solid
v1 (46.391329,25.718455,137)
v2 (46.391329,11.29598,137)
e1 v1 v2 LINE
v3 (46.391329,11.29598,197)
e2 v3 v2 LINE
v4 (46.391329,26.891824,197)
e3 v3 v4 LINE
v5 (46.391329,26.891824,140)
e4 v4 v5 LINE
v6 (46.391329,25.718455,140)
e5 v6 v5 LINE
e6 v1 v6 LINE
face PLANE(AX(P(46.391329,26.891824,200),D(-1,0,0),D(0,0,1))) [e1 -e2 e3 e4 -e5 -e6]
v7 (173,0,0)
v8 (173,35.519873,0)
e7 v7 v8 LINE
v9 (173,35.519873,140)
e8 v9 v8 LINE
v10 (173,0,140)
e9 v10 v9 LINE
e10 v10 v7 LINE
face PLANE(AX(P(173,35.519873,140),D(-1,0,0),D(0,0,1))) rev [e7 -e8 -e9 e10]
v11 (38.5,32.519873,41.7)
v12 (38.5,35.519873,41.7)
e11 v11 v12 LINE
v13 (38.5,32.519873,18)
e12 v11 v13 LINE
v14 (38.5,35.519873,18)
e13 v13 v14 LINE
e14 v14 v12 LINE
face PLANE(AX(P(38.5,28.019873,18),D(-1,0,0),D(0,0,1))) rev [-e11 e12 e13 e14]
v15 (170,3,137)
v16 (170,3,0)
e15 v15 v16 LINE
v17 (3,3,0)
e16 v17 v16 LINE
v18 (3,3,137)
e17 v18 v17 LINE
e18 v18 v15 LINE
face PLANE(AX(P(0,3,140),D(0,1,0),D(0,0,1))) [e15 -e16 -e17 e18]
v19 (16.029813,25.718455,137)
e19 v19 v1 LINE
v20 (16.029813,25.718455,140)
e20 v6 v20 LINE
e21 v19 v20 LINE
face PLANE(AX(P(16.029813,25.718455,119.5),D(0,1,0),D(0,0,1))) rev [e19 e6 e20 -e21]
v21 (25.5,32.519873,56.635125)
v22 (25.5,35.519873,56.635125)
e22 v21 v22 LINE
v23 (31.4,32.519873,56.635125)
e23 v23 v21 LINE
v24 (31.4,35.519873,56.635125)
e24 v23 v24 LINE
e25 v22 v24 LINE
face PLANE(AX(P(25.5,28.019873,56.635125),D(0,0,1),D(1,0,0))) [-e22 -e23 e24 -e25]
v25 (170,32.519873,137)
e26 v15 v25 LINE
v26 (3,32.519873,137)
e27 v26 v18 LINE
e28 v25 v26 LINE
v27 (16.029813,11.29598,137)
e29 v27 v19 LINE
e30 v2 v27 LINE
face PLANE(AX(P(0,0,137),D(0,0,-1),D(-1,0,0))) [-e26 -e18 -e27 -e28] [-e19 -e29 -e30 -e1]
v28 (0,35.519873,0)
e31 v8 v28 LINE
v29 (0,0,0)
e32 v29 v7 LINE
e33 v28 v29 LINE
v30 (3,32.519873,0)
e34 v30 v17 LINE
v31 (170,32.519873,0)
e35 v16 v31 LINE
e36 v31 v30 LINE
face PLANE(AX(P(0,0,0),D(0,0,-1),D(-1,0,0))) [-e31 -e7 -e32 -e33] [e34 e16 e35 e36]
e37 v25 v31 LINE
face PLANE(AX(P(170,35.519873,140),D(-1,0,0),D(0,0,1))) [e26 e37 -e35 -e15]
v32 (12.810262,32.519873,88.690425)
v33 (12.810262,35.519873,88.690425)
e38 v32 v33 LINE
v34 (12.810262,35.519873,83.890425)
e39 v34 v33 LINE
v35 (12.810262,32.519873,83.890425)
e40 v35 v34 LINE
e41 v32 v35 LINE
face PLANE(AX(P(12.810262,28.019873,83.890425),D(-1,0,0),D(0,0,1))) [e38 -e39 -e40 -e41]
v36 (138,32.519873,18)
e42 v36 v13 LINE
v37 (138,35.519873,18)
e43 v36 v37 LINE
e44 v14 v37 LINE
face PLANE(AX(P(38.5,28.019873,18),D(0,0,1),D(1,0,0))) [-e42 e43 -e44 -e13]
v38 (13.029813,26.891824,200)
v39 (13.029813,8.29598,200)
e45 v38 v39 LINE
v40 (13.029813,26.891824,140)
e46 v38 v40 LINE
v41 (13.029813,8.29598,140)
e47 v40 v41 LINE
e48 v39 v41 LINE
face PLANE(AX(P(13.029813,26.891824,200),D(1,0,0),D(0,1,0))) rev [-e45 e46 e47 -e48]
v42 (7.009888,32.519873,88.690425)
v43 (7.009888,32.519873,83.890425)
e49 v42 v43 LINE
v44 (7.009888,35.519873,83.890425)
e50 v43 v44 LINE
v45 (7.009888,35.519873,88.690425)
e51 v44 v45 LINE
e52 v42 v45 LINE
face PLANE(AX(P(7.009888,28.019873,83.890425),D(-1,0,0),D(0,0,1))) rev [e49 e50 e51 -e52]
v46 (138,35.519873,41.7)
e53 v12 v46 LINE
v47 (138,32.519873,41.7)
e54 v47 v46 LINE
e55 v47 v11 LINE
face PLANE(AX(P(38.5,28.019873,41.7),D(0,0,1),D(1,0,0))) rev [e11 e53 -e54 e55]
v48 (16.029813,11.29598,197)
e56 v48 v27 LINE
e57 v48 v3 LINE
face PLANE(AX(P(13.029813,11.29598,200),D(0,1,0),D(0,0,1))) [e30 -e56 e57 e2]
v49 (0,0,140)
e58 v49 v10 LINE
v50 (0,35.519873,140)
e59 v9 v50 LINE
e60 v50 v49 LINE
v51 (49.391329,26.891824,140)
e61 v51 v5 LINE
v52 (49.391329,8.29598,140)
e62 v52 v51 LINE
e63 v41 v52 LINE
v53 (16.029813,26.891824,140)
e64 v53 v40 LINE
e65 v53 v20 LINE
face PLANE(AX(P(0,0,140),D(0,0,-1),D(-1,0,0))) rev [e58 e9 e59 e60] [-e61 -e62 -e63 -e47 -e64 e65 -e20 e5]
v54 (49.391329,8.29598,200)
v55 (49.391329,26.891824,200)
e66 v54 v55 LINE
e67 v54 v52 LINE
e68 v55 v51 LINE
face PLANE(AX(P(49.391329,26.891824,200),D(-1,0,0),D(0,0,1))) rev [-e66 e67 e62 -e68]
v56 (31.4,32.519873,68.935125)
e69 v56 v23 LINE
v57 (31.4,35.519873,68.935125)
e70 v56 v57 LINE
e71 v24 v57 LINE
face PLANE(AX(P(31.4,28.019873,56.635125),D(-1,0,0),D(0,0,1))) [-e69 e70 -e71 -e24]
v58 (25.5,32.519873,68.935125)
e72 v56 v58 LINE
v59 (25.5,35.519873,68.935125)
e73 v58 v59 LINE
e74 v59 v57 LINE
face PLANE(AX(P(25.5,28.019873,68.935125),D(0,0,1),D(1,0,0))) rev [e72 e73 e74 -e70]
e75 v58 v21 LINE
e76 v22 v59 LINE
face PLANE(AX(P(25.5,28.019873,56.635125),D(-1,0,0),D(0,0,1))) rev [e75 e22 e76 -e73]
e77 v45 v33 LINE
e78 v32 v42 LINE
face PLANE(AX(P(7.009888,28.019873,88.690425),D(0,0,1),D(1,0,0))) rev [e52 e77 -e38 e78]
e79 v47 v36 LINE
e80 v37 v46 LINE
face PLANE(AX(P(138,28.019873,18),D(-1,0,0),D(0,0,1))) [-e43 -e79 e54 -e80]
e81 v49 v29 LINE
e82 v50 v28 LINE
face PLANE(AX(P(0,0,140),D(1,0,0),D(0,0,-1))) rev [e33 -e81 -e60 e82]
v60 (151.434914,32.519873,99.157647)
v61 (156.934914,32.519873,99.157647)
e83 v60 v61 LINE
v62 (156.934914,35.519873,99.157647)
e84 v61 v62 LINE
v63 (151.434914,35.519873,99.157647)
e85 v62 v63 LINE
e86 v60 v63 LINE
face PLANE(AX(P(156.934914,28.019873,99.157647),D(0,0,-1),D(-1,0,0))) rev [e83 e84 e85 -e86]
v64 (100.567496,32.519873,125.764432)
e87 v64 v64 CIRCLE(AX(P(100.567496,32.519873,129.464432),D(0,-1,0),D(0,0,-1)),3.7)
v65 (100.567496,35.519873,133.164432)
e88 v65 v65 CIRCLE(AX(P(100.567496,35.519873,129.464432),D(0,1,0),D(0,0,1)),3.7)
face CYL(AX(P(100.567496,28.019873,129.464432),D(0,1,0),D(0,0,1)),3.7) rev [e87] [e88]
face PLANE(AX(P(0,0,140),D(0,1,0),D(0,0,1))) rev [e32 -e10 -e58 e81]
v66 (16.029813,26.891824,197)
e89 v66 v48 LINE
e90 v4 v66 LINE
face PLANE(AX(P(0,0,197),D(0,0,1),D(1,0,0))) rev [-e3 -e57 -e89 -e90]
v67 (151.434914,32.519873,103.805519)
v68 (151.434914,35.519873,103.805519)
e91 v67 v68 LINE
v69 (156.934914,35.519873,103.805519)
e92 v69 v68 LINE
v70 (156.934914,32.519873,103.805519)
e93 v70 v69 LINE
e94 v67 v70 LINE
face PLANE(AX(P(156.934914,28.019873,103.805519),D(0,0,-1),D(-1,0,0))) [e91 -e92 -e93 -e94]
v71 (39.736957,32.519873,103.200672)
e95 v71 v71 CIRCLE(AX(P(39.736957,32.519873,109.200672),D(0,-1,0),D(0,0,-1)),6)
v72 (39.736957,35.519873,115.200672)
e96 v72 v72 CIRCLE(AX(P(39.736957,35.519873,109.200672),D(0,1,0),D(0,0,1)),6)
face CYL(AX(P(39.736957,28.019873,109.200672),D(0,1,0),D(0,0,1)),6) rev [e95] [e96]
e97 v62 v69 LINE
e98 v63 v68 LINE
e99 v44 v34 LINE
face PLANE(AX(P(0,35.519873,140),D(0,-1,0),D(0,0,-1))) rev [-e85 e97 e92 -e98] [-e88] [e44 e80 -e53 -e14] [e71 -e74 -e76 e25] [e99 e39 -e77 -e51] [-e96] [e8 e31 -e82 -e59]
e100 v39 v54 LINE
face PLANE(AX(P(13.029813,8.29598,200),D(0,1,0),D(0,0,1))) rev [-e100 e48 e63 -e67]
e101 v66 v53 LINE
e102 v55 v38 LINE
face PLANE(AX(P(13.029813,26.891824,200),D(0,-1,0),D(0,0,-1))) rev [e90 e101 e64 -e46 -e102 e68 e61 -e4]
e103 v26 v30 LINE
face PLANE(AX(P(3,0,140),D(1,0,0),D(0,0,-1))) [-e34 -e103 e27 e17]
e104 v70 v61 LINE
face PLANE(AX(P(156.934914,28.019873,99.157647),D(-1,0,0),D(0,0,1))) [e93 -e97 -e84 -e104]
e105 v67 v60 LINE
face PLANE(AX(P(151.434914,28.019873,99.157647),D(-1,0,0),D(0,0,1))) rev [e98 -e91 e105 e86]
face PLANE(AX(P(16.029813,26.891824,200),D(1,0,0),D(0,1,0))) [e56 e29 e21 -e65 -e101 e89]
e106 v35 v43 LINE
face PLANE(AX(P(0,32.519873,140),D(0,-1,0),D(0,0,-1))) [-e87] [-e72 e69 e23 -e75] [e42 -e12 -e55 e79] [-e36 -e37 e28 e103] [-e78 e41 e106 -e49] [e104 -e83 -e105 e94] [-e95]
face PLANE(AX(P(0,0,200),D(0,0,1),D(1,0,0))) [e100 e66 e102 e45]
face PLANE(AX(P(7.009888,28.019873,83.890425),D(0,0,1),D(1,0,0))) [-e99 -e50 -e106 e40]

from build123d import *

# Parameters (mm, degrees)
SKETCH1_W           = 173
SKETCH1_H           = 35.519872746
BOSS_EXTRUDE2_DEPTH = 140
SHELL3_T            = -3
SKETCH3_R           = 6
SKETCH3_R_2         = 3.7
SKETCH3_W           = 99.5
SKETCH3_H           = 23.7
SKETCH3_W_2         = 5.9
SKETCH3_H_2         = 12.3
SKETCH3_W_3         = 5.800374035
SKETCH3_H_3         = 4.8
SKETCH3_W_4         = 5.5
SKETCH3_H_4         = 4.647872836
CUT_EXTRUDE3_DEPTH  = 7.5
SKETCH5_W           = 36.361516307
SKETCH5_H           = 18.595843956
BOSS_EXTRUDE4_DEPTH = 60
SHELL5_START        = 140
SHELL5_OUTLINE_W    = 30.361516307
SHELL5_OUTLINE_H    = 15.595843956
SHELL5_DEPTH        = 57
SKETCH8_W           = 30.361516307
SKETCH8_H           = 14.422474908
CUT_EXTRUDE6_DEPTH  = 20.5


# Read off the part's stored shape, not the designer's step: Shell5
with BuildPart() as part:
    # Sketch1 → Boss-Extrude2 (new body)
    with BuildSketch(Plane.XY):
        with Locations((86.5, 17.759936373)):
            Rectangle(SKETCH1_W, SKETCH1_H)
    extrude(amount=BOSS_EXTRUDE2_DEPTH)

    # Shell3
    shell3_openings = [part.faces().sort_by_distance(p)[0] for p in [
        (86.5, 17.759936373, 0),
    ]]
    offset(amount=SHELL3_T, openings=shell3_openings, kind=Kind.INTERSECTION)

    # Sketch3 → Cut-Extrude3 (cut)
    with BuildSketch(Plane(origin=(0, 35.519872746, 0), x_dir=(1, 0, 0), z_dir=(0, 1, 0))):
        with Locations(Location((39.736956851, -109.200672262, 0), (0, 0, 270))):
            Circle(SKETCH3_R)
        with Locations(Location((100.567495644, -129.464431968, 0), (0, 0, 270))):
            Circle(SKETCH3_R_2)
        with Locations((88.25, -29.85)):
            Rectangle(SKETCH3_W, SKETCH3_H)
        with Locations((28.45, -62.785125048)):
            Rectangle(SKETCH3_W_2, SKETCH3_H_2)
        with Locations((9.910075314, -86.290425048)):
            Rectangle(SKETCH3_W_3, SKETCH3_H_3)
        with Locations((154.184914317, -101.481582974)):
            Rectangle(SKETCH3_W_4, SKETCH3_H_4)
    extrude(amount=-CUT_EXTRUDE3_DEPTH, mode=Mode.SUBTRACT)

    # Sketch5 → Boss-Extrude4 (add)
    with BuildSketch(Plane.XY.offset(140)):
        with Locations((31.210571096, 17.593902052)):
            Rectangle(SKETCH5_W, SKETCH5_H)
    extrude(amount=BOSS_EXTRUDE4_DEPTH)

    # Shell5 outline → Shell5 (cut)
    with BuildSketch(Plane.XY.offset(SHELL5_START)):
        with Locations((31.210571096, 19.093902052)):
            Rectangle(SHELL5_OUTLINE_W, SHELL5_OUTLINE_H)
    extrude(amount=SHELL5_DEPTH, mode=Mode.SUBTRACT)

    # Sketch8 → Cut-Extrude6 (cut)
    with BuildSketch(Plane.XY.offset(140)):
        with Locations((31.210571096, 18.507217528)):
            Rectangle(SKETCH8_W, SKETCH8_H)
    extrude(amount=-CUT_EXTRUDE6_DEPTH, mode=Mode.SUBTRACT)


solid = part.part
